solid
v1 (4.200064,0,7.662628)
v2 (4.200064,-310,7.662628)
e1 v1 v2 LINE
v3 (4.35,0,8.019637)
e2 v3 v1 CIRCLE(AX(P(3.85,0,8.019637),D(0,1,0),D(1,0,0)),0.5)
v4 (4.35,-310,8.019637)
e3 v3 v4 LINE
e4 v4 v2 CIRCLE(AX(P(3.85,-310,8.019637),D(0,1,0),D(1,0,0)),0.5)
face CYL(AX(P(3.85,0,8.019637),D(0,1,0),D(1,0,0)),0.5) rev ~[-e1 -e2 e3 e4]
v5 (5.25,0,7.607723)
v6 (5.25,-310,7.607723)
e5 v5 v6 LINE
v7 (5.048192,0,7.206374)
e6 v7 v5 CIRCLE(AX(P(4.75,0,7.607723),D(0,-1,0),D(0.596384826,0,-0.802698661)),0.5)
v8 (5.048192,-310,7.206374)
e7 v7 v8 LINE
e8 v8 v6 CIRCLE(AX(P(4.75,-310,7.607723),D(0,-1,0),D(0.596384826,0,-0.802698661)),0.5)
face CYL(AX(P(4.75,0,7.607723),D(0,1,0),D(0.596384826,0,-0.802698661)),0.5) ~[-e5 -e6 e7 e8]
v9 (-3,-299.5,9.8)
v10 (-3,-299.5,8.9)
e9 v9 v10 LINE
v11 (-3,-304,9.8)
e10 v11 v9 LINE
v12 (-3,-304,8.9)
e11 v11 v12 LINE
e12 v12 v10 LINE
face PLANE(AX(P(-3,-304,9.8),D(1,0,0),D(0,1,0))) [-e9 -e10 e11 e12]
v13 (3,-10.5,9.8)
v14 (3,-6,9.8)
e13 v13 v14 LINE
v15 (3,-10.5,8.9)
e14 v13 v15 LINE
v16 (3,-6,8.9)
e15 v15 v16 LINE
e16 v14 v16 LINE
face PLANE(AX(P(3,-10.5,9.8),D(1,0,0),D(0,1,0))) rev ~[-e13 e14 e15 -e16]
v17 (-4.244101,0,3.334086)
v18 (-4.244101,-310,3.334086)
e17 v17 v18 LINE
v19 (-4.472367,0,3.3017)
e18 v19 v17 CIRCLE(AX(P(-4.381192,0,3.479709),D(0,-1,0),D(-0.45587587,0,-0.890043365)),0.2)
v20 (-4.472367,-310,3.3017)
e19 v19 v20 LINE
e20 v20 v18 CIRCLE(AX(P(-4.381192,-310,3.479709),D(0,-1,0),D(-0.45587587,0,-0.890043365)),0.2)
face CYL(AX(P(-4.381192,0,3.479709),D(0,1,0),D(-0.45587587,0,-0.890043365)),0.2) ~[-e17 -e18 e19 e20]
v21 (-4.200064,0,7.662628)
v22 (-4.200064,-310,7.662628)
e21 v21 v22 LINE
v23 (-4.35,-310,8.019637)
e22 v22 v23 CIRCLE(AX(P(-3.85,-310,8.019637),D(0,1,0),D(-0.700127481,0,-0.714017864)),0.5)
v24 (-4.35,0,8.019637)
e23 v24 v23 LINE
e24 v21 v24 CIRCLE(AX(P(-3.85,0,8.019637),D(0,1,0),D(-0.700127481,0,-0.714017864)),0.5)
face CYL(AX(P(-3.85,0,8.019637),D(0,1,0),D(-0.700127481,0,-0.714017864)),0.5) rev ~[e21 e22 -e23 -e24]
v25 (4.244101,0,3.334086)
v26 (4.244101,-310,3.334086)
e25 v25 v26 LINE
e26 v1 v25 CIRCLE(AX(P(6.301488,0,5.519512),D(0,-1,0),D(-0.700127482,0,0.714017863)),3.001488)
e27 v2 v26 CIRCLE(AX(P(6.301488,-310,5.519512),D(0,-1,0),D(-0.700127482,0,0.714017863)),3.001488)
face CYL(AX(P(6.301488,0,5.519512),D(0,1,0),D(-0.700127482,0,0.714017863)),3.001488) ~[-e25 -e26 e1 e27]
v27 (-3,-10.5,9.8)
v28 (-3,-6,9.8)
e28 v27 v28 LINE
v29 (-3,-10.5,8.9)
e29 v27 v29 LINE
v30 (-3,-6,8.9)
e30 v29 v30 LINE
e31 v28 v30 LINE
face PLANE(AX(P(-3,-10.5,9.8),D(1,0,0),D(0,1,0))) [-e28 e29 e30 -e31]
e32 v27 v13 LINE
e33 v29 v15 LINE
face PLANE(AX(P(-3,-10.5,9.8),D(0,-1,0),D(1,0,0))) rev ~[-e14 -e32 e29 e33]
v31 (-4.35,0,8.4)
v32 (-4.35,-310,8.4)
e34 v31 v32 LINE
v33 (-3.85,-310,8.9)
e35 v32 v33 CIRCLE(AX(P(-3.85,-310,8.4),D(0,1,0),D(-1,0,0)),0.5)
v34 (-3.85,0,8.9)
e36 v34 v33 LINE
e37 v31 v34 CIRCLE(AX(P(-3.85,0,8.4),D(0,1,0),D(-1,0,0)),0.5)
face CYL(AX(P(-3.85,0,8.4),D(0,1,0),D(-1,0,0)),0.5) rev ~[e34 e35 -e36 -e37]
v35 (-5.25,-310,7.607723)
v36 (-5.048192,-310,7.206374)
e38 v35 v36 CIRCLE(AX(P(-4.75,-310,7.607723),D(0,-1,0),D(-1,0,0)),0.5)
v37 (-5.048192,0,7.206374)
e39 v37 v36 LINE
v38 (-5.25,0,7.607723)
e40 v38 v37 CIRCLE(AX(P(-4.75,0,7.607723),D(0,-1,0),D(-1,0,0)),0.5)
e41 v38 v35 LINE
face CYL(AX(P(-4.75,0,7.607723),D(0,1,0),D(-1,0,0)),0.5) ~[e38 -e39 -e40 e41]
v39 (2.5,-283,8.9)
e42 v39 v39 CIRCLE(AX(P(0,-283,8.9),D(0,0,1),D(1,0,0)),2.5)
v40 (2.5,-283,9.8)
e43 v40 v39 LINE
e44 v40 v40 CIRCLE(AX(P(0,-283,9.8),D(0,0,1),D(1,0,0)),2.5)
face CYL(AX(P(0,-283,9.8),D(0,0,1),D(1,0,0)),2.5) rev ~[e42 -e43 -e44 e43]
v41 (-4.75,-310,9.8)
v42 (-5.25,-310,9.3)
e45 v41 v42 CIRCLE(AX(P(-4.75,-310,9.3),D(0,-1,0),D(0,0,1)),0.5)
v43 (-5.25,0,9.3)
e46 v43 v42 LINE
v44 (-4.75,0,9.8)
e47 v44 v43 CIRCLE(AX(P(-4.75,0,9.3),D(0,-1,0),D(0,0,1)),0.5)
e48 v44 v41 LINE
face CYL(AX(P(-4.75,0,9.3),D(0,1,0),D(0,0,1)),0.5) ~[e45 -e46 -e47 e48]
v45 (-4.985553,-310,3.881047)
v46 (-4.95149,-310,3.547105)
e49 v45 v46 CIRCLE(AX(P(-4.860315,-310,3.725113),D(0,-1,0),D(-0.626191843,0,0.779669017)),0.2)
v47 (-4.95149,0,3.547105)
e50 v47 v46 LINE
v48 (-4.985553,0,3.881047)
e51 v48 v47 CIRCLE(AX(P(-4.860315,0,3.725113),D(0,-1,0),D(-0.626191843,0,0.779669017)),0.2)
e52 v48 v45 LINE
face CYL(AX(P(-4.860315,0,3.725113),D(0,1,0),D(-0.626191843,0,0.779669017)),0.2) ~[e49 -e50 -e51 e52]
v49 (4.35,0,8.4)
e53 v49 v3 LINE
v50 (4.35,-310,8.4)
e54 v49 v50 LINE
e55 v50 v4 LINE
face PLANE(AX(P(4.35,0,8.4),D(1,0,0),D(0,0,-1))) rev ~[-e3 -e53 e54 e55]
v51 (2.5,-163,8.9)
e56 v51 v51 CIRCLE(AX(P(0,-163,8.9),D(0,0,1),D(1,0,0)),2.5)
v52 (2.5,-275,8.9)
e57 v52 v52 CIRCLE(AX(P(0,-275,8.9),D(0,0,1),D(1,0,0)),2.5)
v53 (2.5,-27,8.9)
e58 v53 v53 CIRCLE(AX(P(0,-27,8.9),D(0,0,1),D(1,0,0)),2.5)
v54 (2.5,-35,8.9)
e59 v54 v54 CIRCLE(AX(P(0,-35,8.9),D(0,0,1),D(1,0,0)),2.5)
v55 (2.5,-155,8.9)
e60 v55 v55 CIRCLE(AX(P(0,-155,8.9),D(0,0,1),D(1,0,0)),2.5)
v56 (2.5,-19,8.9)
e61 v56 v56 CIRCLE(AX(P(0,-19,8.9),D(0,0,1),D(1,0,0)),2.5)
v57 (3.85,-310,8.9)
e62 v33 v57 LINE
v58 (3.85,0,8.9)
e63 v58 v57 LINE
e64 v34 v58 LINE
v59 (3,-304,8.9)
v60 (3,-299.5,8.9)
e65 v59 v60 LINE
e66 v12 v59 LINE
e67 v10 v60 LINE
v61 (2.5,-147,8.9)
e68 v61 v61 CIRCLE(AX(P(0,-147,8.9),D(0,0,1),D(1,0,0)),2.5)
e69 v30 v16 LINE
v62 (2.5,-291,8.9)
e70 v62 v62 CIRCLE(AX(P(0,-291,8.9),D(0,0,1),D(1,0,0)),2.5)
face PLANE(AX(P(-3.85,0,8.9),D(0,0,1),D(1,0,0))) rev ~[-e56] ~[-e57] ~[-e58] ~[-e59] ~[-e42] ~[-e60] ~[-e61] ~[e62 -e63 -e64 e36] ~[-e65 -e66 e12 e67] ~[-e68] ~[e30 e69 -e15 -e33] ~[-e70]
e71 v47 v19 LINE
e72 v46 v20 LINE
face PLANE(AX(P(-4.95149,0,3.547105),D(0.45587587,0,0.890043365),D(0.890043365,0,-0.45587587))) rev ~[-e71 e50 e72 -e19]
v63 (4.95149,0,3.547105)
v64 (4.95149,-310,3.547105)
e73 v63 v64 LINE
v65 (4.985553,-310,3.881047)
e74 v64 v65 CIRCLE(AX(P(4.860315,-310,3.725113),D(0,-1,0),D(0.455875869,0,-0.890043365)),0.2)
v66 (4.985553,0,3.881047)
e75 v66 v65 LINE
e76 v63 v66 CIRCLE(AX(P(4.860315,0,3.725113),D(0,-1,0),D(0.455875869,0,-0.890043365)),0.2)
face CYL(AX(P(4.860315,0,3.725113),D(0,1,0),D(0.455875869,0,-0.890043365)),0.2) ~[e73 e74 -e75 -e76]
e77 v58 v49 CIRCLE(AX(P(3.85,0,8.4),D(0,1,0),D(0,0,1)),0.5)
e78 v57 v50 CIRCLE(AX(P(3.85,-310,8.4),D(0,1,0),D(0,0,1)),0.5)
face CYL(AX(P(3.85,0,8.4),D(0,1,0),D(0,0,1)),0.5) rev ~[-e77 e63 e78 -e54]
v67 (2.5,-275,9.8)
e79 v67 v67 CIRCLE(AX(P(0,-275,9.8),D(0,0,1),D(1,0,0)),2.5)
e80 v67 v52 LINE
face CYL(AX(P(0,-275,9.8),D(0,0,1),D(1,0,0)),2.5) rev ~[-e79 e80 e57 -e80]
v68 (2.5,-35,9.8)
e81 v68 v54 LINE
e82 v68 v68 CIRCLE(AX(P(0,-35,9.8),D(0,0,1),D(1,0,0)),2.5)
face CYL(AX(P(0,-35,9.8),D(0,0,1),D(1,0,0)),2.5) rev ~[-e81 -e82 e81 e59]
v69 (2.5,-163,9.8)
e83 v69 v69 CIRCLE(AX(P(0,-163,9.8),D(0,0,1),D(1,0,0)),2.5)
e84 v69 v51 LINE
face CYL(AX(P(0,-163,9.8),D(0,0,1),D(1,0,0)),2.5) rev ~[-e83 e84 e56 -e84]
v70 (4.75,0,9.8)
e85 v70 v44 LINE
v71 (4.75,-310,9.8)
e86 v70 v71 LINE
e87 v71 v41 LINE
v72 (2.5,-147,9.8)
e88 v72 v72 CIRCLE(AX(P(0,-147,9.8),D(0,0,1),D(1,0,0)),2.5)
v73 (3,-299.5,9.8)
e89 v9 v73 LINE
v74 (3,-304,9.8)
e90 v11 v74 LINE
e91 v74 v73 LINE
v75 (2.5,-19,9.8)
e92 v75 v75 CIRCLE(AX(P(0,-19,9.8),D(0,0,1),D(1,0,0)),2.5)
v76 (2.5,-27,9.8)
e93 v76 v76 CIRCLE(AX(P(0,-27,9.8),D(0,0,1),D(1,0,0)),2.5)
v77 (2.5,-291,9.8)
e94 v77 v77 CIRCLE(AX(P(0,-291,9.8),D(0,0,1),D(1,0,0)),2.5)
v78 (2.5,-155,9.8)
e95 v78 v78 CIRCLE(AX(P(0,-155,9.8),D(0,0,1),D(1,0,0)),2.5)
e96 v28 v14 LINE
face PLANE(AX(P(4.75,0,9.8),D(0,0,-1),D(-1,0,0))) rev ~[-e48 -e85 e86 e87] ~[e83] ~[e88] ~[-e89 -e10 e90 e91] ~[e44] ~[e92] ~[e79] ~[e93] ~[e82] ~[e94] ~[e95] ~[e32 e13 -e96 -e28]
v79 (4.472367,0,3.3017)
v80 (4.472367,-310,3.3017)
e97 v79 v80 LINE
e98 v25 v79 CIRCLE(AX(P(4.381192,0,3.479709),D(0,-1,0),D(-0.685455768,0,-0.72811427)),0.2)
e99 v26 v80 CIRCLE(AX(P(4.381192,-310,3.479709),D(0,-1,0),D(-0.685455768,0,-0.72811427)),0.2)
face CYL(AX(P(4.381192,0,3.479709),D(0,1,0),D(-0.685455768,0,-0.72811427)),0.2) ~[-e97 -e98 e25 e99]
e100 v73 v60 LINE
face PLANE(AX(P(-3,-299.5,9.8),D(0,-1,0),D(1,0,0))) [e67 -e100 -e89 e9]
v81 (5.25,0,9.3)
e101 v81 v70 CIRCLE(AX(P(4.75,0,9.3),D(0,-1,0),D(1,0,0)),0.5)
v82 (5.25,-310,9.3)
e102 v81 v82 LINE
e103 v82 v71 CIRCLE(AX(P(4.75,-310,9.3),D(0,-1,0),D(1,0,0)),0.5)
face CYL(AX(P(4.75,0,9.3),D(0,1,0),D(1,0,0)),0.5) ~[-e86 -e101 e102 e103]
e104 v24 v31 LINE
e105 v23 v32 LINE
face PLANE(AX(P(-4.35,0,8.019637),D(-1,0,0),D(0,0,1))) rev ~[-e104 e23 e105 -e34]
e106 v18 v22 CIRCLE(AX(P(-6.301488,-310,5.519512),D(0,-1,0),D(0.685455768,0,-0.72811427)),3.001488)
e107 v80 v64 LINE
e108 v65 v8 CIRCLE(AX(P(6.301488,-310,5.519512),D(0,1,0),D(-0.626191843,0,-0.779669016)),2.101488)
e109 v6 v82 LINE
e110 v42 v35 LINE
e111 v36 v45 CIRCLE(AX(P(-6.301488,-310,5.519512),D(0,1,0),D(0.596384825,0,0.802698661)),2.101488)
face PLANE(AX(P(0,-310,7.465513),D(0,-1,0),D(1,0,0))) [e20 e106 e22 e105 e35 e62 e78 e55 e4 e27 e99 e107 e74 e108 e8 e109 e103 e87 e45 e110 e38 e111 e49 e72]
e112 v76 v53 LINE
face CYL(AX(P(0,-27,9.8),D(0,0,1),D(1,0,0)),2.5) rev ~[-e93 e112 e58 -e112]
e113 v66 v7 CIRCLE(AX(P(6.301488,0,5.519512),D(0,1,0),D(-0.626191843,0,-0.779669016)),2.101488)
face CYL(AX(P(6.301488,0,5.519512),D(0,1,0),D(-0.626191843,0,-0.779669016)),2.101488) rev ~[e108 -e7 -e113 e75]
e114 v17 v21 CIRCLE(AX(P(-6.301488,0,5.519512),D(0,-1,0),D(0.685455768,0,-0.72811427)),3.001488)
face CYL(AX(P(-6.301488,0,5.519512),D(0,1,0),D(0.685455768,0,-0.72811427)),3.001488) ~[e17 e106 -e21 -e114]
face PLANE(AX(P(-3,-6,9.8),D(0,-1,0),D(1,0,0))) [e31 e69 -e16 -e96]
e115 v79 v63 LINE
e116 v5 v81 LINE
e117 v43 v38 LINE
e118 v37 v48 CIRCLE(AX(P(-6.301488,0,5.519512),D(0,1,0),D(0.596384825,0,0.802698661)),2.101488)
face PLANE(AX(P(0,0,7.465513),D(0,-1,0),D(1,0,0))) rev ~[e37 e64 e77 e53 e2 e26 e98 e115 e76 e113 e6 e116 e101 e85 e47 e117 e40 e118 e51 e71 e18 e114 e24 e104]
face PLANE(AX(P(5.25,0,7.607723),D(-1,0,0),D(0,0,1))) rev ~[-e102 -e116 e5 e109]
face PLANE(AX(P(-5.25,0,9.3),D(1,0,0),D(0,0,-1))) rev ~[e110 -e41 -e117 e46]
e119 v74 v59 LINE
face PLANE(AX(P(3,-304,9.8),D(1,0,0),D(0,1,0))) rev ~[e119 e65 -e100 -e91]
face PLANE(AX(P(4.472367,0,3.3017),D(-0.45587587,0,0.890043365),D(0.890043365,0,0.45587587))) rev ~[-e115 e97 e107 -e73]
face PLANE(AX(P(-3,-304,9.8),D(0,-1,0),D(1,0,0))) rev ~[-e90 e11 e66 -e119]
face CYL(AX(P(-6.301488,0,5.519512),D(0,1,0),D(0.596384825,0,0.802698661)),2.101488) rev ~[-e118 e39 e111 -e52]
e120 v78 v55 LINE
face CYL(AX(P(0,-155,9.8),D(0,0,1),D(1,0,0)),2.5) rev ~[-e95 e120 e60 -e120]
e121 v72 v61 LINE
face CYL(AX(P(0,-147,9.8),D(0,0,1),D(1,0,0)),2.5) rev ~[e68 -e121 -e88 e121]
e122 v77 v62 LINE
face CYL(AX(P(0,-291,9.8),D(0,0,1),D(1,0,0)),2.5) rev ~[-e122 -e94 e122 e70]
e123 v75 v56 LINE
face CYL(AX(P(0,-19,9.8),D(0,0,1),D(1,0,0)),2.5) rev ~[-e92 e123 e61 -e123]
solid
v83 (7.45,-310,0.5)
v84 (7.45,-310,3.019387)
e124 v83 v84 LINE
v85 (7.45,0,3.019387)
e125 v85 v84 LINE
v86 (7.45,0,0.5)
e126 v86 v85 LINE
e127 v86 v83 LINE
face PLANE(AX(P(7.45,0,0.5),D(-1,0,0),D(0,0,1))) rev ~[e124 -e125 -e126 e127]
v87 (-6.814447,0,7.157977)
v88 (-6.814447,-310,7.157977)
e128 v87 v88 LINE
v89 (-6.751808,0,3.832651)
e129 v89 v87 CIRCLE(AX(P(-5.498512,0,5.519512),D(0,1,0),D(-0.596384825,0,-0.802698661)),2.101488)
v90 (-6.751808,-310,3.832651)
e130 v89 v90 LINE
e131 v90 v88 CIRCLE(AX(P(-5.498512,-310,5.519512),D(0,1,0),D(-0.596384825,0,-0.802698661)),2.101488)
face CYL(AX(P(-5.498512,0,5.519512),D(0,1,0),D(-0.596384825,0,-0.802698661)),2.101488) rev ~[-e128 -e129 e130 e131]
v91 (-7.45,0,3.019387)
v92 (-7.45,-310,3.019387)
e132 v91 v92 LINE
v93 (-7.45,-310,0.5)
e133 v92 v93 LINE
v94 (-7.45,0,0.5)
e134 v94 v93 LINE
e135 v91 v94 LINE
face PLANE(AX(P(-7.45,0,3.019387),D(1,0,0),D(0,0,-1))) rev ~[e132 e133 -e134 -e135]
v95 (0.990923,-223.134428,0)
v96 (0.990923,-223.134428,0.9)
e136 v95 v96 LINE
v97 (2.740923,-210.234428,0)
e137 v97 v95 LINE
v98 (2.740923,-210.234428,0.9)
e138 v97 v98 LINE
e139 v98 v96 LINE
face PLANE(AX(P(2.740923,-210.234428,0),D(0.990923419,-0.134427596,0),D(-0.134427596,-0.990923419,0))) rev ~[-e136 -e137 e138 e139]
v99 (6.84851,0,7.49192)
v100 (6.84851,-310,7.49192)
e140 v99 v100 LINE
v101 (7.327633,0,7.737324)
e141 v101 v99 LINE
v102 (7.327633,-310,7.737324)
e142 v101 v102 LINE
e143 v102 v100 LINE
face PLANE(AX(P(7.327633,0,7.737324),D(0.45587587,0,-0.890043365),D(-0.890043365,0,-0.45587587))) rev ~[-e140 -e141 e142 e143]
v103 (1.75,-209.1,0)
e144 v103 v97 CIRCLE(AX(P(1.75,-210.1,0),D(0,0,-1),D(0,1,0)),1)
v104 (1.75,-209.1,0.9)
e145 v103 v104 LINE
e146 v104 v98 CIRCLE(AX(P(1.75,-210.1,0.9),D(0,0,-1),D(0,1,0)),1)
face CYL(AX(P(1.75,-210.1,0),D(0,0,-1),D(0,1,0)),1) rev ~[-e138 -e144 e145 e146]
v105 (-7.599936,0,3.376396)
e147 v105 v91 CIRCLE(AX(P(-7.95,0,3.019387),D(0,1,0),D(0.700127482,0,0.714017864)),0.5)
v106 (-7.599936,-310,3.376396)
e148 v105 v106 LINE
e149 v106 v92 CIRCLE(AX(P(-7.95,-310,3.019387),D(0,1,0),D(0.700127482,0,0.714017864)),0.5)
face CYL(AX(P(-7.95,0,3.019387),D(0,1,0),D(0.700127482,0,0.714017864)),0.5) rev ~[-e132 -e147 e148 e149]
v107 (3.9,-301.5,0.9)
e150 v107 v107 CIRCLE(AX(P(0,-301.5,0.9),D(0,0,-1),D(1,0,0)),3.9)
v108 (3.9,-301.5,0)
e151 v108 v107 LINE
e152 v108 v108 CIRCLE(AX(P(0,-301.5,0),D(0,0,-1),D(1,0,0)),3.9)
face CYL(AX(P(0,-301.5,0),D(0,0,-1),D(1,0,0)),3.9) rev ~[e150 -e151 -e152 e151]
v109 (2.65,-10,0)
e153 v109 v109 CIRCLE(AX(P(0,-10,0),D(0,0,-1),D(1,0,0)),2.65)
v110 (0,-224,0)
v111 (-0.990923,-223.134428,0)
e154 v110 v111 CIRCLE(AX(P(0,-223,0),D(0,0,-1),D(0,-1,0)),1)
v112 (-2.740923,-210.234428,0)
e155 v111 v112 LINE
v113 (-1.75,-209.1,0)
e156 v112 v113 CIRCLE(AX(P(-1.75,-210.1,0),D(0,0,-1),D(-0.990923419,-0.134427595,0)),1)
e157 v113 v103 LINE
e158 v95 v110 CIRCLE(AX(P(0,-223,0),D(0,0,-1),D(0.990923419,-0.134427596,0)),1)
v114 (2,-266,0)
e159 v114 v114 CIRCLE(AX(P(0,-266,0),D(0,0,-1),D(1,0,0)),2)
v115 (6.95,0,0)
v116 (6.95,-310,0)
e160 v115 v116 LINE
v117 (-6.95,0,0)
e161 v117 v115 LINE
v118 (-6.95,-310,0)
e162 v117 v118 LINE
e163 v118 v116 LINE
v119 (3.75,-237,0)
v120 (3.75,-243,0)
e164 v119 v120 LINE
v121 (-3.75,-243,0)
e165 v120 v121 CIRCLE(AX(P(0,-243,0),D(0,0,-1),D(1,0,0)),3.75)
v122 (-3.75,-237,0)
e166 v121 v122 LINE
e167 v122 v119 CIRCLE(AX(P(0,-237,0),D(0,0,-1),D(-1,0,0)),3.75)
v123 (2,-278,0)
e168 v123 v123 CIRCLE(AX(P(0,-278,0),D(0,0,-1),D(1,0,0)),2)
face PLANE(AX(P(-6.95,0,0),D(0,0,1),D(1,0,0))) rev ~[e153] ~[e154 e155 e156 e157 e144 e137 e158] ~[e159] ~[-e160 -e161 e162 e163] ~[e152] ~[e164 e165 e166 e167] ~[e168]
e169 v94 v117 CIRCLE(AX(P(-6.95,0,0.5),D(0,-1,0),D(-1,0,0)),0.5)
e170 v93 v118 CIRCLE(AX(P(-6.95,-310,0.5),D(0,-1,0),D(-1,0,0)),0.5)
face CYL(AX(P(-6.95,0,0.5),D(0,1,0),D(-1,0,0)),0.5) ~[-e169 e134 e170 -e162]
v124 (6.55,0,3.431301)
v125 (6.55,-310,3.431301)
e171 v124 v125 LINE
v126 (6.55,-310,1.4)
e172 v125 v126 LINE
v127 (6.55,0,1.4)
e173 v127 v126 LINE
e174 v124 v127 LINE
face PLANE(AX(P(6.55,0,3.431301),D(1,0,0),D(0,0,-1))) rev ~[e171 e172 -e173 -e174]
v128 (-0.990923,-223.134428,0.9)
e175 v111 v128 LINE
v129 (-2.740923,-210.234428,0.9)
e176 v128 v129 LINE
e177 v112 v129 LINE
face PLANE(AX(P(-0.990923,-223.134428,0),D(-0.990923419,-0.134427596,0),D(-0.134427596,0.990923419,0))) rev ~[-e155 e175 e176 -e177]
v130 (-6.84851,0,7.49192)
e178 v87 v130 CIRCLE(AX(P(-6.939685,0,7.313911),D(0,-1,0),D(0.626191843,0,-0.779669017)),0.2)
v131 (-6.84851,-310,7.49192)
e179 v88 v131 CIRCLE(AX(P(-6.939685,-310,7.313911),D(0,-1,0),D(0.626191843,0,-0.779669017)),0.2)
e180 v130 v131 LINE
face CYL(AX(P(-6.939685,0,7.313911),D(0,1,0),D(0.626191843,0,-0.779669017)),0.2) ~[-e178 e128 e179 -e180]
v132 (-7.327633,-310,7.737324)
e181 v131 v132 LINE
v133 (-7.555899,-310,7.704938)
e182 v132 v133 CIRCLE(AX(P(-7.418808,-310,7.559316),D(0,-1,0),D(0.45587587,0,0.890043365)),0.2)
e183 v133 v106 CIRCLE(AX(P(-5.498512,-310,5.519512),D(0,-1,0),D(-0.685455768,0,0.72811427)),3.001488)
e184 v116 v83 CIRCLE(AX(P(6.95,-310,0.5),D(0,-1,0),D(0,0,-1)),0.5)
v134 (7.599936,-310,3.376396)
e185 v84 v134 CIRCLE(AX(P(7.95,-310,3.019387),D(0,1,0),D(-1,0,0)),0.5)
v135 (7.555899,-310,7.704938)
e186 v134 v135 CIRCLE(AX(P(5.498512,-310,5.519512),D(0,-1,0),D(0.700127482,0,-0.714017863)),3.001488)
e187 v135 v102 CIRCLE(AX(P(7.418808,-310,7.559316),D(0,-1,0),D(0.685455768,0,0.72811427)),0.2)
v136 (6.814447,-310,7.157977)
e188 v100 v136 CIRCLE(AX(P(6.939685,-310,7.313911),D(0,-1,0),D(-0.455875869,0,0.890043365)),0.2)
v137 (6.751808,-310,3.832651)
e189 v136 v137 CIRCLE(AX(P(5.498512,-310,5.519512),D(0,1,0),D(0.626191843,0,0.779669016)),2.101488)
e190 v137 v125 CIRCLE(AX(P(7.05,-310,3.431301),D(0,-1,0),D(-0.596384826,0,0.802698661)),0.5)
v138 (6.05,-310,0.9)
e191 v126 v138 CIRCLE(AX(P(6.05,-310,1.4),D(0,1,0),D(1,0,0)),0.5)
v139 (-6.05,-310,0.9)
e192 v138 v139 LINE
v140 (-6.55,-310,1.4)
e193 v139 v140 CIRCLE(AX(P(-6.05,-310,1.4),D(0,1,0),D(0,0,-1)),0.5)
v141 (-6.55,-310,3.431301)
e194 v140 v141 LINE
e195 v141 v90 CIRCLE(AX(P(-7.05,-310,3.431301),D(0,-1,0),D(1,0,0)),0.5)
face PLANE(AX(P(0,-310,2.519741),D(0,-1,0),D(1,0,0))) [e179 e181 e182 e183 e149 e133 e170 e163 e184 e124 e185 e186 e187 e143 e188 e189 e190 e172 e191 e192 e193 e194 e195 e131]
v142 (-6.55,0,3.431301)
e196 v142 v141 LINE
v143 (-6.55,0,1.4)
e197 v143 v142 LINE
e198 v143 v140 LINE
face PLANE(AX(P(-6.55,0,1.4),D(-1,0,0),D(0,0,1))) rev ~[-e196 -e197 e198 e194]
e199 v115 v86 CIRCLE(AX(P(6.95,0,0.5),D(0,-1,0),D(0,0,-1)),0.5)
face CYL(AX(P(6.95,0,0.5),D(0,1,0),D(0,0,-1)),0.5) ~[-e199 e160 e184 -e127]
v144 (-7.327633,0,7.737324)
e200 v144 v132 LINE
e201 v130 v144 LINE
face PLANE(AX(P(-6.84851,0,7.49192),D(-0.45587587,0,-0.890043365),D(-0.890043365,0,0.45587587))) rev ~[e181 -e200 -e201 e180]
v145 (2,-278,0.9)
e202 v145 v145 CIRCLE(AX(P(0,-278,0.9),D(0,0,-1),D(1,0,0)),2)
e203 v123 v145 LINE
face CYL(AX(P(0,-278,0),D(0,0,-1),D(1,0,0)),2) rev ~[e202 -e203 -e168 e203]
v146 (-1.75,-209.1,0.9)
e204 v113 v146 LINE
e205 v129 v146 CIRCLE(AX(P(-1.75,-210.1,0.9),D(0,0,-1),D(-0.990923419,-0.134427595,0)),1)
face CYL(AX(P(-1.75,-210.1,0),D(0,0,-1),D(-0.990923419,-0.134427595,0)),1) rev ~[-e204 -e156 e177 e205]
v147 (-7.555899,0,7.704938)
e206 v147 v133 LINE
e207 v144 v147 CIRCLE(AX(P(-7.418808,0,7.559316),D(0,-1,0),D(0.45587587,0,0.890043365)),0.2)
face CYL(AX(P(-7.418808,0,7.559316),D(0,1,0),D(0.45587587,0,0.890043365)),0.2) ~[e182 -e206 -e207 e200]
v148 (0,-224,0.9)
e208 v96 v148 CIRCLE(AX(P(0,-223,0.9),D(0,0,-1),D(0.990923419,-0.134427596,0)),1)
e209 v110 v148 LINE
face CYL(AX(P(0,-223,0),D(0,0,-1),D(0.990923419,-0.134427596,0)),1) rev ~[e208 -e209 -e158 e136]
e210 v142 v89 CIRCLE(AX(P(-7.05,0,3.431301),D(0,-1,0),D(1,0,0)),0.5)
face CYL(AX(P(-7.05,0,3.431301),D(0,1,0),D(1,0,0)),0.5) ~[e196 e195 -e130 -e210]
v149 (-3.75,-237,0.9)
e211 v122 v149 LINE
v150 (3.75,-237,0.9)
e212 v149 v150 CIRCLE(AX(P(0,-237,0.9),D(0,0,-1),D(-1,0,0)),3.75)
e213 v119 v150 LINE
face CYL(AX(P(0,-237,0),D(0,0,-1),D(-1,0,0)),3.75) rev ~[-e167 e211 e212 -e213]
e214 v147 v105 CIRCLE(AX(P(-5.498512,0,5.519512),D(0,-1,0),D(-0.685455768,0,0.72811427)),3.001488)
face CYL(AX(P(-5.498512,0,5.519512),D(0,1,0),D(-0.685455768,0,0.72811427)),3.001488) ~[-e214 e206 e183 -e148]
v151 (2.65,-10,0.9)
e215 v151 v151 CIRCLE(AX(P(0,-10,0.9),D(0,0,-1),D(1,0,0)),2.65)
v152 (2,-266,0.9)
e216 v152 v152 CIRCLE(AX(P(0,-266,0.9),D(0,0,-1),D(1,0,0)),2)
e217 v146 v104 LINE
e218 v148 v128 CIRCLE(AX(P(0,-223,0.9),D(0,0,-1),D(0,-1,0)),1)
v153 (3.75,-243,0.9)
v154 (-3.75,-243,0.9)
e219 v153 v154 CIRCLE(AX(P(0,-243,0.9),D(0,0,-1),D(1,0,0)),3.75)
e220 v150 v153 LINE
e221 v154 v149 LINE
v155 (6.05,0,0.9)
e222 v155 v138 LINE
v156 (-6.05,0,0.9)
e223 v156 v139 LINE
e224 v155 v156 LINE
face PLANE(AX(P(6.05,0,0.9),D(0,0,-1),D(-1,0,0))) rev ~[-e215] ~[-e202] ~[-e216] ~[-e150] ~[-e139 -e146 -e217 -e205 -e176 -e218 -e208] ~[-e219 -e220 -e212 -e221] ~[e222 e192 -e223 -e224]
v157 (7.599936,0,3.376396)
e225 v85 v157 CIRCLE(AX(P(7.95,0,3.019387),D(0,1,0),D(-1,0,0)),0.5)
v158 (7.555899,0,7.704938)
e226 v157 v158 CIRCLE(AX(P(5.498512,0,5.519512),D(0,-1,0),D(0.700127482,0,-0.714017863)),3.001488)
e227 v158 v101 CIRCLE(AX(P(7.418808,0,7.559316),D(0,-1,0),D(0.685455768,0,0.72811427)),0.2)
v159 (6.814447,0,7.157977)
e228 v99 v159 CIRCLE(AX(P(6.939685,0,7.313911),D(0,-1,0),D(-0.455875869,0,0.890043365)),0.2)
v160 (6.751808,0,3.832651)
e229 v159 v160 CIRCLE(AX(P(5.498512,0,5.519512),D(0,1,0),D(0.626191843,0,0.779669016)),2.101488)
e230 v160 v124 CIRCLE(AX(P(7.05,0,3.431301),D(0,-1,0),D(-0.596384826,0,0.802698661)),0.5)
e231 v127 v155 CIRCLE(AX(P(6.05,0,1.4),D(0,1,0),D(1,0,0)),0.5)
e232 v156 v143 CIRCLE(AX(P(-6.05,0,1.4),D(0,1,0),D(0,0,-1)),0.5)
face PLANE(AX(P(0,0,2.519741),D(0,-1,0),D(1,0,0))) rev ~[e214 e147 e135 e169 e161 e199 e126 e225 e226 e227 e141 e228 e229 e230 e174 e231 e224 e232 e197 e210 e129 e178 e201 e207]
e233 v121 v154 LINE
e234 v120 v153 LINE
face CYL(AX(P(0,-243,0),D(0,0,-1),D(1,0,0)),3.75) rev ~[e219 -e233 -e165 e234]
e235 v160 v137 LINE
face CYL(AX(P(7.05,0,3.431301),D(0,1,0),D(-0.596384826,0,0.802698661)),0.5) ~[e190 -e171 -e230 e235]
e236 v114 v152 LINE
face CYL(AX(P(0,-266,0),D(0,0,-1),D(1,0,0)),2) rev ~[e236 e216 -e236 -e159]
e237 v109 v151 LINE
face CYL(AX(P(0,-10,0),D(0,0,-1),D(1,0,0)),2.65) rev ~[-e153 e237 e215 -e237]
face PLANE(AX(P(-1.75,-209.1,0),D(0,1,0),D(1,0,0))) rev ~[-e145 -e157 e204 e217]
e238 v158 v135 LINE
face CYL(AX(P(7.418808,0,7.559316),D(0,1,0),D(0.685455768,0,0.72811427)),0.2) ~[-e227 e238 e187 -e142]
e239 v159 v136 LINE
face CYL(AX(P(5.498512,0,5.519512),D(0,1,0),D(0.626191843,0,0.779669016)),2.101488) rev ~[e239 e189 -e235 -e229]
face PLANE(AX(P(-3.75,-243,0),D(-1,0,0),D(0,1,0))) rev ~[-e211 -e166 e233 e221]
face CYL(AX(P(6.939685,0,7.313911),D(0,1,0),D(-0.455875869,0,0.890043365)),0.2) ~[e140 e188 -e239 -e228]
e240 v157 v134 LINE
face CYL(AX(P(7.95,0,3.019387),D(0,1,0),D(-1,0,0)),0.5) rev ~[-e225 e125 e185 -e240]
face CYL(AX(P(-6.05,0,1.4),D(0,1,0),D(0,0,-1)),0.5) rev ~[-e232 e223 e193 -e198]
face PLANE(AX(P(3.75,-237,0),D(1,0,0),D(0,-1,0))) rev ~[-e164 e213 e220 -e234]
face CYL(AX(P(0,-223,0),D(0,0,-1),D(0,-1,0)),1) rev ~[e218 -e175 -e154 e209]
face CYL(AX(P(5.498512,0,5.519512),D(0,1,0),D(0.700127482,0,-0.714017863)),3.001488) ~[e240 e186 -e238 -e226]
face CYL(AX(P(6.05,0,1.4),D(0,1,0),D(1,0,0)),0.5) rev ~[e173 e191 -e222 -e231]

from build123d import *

# Parameters (mm, degrees)
F1_DEPTH = 310
F2_R     = 2.65
F2_R_2   = 3.9
F2_R_3   = 2
F3_DEPTH = 25
F4_DEPTH = 310
F5_R     = 2.5
F5_W     = 6
F5_H     = 4.5
F6_DEPTH = 25


with BuildPart() as f1:
    # F0 (on Front) → F1 (new body)
    with BuildSketch(Plane.XZ):
        with BuildLine():
            Line((-6.95, 0), (0, 0))
            Line((0, 0), (6.95, 0))
            ThreePointArc((6.95, 0), (7.3035533906, 0.1464466094), (7.45, 0.5))
            Line((7.45, 0.5), (7.45, 3.0193872726))
            ThreePointArc((7.45, 3.0193872726), (7.4890054933, 3.212995291), (7.5999362592, 3.3763962044))
            ThreePointArc((7.5999362592, 3.3763962044), (8.499844681, 5.5500466323), (7.5558992874, 7.70493838))
            ThreePointArc((7.5558992874, 7.70493838), (7.4469022544, 7.7573324959), (7.3276329598, 7.7373241989))
            Line((7.3276329598, 7.7373241989), (6.8485098701, 7.4919196896))
            ThreePointArc((6.8485098701, 7.4919196896), (6.7407174594, 7.3342063431), (6.8144466754, 7.1579772133))
            ThreePointArc((6.8144466754, 7.1579772133), (7.5996272621, 5.4799335442), (6.7518075872, 3.8326506577))
            ThreePointArc((6.7518075872, 3.8326506577), (6.6032919262, 3.6559163242), (6.55, 3.4313013274))
            Line((6.55, 3.4313013274), (6.55, 1.4))
            ThreePointArc((6.55, 1.4), (6.4035533906, 1.0464466094), (6.05, 0.9))
            Line((6.05, 0.9), (0, 0.9))
            Line((0, 0.9), (-6.05, 0.9))
            ThreePointArc((-6.05, 0.9), (-6.4035533906, 1.0464466094), (-6.55, 1.4))
            Line((-6.55, 1.4), (-6.55, 3.4313013274))
            ThreePointArc((-6.55, 3.4313013274), (-6.6032919262, 3.6559163242), (-6.7518075872, 3.8326506577))
            ThreePointArc((-6.7518075872, 3.8326506577), (-7.5996272621, 5.4799335442), (-6.8144466754, 7.1579772133))
            ThreePointArc((-6.8144466754, 7.1579772133), (-6.7407174594, 7.3342063431), (-6.8485098701, 7.4919196896))
            Line((-6.8485098701, 7.4919196896), (-7.3276329598, 7.7373241989))
            ThreePointArc((-7.3276329598, 7.7373241989), (-7.4469022544, 7.7573324959), (-7.5558992874, 7.70493838))
            ThreePointArc((-7.5558992874, 7.70493838), (-8.499844681, 5.5500466323), (-7.5999362592, 3.3763962044))
            ThreePointArc((-7.5999362592, 3.3763962044), (-7.4890054933, 3.212995291), (-7.45, 3.0193872726))
            Line((-7.45, 3.0193872726), (-7.45, 0.5))
            ThreePointArc((-7.45, 0.5), (-7.3035533906, 0.1464466094), (-6.95, 0))
        make_face()
    extrude(amount=F1_DEPTH)

    # F2 (on face) → F3 (cut)
    with BuildSketch(Plane(origin=(0, 0, 0), x_dir=(1, 0, 0), z_dir=(0, 0, -1))):
        with Locations((0, 10)):
            Circle(F2_R)
        with Locations((0, 301.5)):
            Circle(F2_R_2)
        with Locations((0, 278)):
            Circle(F2_R_3)
        with Locations((0, 266)):
            Circle(F2_R_3)
        with BuildLine():
            ThreePointArc((3.75, 243), (0, 246.75), (-3.75, 243))
            Line((-3.75, 243), (-3.75, 237))
            ThreePointArc((-3.75, 237), (0, 233.25), (3.75, 237))
            Line((3.75, 237), (3.75, 243))
        make_face()
        with BuildLine():
            ThreePointArc((0.9909234186, 223.1344275955), (0.6578648814, 223.7531359756), (0, 224))
            ThreePointArc((0, 224), (-0.6578648814, 223.7531359756), (-0.9909234186, 223.1344275955))
            Line((-0.9909234186, 223.1344275955), (-2.7409234186, 210.2344275955))
            ThreePointArc((-2.7409234186, 210.2344275955), (-2.5031359756, 209.4421351186), (-1.75, 209.1))
            Line((-1.75, 209.1), (0, 209.1))
            Line((0, 209.1), (1.75, 209.1))
            ThreePointArc((1.75, 209.1), (2.5031359756, 209.4421351186), (2.7409234186, 210.2344275955))
            Line((2.7409234186, 210.2344275955), (0.9909234186, 223.1344275955))
        make_face()
    extrude(amount=-F3_DEPTH, mode=Mode.SUBTRACT)


with BuildPart() as f4:
    # F0 (on Front) → F4 (new body, through all)
    with BuildSketch(Plane.XZ):
        with BuildLine():
            Line((4.75, 9.8), (0, 9.8))
            Line((0, 9.8), (-4.75, 9.8))
            ThreePointArc((-4.75, 9.8), (-5.1035533906, 9.6535533906), (-5.25, 9.3))
            Line((-5.25, 9.3), (-5.25, 7.6077230629))
            ThreePointArc((-5.25, 7.6077230629), (-5.1967080738, 7.383108066), (-5.0481924128, 7.2063737325))
            ThreePointArc((-5.0481924128, 7.2063737325), (-4.2003727379, 5.559090846), (-4.9855533246, 3.8810471769))
            ThreePointArc((-4.9855533246, 3.8810471769), (-5.0592825406, 3.7048180472), (-4.9514901299, 3.5471047007))
            Line((-4.9514901299, 3.5471047007), (-4.4723670402, 3.3017001913))
            ThreePointArc((-4.4723670402, 3.3017001913), (-4.3530977456, 3.2816918943), (-4.2441007126, 3.3340860103))
            ThreePointArc((-4.2441007126, 3.3340860103), (-3.300155319, 5.488977758), (-4.2000637408, 7.6626281859))
            ThreePointArc((-4.2000637408, 7.6626281859), (-4.3109945067, 7.8260290992), (-4.35, 8.0196371176))
            Line((-4.35, 8.0196371176), (-4.35, 8.4))
            ThreePointArc((-4.35, 8.4), (-4.2035533906, 8.7535533906), (-3.85, 8.9))
            Line((-3.85, 8.9), (0, 8.9))
            Line((0, 8.9), (3.85, 8.9))
            ThreePointArc((3.85, 8.9), (4.2035533906, 8.7535533906), (4.35, 8.4))
            Line((4.35, 8.4), (4.35, 8.0196371176))
            ThreePointArc((4.35, 8.0196371176), (4.3109945067, 7.8260290992), (4.2000637408, 7.6626281859))
            ThreePointArc((4.2000637408, 7.6626281859), (3.300155319, 5.488977758), (4.2441007126, 3.3340860103))
            ThreePointArc((4.2441007126, 3.3340860103), (4.3530977456, 3.2816918943), (4.4723670402, 3.3017001913))
            Line((4.4723670402, 3.3017001913), (4.9514901299, 3.5471047007))
            ThreePointArc((4.9514901299, 3.5471047007), (5.0592825406, 3.7048180472), (4.9855533246, 3.8810471769))
            ThreePointArc((4.9855533246, 3.8810471769), (4.2003727379, 5.559090846), (5.0481924128, 7.2063737325))
            ThreePointArc((5.0481924128, 7.2063737325), (5.1967080738, 7.383108066), (5.25, 7.6077230629))
            Line((5.25, 7.6077230629), (5.25, 9.3))
            ThreePointArc((5.25, 9.3), (5.1035533906, 9.6535533906), (4.75, 9.8))
        make_face()
    extrude(amount=F4_DEPTH)

    # F5 (on face) → F6 (cut)
    with BuildSketch(Plane.XY.offset(9.8)):
        with Locations((0, -19)):
            Circle(F5_R)
        with Locations((0, -27)):
            Circle(F5_R)
        with Locations((0, -35)):
            Circle(F5_R)
        with Locations((0, -8.25)):
            Rectangle(F5_W, F5_H)
        with Locations((0, -283)):
            Circle(F5_R)
        with Locations((0, -291)):
            Circle(F5_R)
        with Locations((0, -275)):
            Circle(F5_R)
        with Locations((0, -163)):
            Circle(F5_R)
        with Locations((0, -155)):
            Circle(F5_R)
        with Locations((0, -147)):
            Circle(F5_R)
        with Locations((0, -301.75)):
            Rectangle(F5_W, F5_H)
    extrude(amount=-F6_DEPTH, mode=Mode.SUBTRACT)


solid = Compound([f1.part, f4.part])
